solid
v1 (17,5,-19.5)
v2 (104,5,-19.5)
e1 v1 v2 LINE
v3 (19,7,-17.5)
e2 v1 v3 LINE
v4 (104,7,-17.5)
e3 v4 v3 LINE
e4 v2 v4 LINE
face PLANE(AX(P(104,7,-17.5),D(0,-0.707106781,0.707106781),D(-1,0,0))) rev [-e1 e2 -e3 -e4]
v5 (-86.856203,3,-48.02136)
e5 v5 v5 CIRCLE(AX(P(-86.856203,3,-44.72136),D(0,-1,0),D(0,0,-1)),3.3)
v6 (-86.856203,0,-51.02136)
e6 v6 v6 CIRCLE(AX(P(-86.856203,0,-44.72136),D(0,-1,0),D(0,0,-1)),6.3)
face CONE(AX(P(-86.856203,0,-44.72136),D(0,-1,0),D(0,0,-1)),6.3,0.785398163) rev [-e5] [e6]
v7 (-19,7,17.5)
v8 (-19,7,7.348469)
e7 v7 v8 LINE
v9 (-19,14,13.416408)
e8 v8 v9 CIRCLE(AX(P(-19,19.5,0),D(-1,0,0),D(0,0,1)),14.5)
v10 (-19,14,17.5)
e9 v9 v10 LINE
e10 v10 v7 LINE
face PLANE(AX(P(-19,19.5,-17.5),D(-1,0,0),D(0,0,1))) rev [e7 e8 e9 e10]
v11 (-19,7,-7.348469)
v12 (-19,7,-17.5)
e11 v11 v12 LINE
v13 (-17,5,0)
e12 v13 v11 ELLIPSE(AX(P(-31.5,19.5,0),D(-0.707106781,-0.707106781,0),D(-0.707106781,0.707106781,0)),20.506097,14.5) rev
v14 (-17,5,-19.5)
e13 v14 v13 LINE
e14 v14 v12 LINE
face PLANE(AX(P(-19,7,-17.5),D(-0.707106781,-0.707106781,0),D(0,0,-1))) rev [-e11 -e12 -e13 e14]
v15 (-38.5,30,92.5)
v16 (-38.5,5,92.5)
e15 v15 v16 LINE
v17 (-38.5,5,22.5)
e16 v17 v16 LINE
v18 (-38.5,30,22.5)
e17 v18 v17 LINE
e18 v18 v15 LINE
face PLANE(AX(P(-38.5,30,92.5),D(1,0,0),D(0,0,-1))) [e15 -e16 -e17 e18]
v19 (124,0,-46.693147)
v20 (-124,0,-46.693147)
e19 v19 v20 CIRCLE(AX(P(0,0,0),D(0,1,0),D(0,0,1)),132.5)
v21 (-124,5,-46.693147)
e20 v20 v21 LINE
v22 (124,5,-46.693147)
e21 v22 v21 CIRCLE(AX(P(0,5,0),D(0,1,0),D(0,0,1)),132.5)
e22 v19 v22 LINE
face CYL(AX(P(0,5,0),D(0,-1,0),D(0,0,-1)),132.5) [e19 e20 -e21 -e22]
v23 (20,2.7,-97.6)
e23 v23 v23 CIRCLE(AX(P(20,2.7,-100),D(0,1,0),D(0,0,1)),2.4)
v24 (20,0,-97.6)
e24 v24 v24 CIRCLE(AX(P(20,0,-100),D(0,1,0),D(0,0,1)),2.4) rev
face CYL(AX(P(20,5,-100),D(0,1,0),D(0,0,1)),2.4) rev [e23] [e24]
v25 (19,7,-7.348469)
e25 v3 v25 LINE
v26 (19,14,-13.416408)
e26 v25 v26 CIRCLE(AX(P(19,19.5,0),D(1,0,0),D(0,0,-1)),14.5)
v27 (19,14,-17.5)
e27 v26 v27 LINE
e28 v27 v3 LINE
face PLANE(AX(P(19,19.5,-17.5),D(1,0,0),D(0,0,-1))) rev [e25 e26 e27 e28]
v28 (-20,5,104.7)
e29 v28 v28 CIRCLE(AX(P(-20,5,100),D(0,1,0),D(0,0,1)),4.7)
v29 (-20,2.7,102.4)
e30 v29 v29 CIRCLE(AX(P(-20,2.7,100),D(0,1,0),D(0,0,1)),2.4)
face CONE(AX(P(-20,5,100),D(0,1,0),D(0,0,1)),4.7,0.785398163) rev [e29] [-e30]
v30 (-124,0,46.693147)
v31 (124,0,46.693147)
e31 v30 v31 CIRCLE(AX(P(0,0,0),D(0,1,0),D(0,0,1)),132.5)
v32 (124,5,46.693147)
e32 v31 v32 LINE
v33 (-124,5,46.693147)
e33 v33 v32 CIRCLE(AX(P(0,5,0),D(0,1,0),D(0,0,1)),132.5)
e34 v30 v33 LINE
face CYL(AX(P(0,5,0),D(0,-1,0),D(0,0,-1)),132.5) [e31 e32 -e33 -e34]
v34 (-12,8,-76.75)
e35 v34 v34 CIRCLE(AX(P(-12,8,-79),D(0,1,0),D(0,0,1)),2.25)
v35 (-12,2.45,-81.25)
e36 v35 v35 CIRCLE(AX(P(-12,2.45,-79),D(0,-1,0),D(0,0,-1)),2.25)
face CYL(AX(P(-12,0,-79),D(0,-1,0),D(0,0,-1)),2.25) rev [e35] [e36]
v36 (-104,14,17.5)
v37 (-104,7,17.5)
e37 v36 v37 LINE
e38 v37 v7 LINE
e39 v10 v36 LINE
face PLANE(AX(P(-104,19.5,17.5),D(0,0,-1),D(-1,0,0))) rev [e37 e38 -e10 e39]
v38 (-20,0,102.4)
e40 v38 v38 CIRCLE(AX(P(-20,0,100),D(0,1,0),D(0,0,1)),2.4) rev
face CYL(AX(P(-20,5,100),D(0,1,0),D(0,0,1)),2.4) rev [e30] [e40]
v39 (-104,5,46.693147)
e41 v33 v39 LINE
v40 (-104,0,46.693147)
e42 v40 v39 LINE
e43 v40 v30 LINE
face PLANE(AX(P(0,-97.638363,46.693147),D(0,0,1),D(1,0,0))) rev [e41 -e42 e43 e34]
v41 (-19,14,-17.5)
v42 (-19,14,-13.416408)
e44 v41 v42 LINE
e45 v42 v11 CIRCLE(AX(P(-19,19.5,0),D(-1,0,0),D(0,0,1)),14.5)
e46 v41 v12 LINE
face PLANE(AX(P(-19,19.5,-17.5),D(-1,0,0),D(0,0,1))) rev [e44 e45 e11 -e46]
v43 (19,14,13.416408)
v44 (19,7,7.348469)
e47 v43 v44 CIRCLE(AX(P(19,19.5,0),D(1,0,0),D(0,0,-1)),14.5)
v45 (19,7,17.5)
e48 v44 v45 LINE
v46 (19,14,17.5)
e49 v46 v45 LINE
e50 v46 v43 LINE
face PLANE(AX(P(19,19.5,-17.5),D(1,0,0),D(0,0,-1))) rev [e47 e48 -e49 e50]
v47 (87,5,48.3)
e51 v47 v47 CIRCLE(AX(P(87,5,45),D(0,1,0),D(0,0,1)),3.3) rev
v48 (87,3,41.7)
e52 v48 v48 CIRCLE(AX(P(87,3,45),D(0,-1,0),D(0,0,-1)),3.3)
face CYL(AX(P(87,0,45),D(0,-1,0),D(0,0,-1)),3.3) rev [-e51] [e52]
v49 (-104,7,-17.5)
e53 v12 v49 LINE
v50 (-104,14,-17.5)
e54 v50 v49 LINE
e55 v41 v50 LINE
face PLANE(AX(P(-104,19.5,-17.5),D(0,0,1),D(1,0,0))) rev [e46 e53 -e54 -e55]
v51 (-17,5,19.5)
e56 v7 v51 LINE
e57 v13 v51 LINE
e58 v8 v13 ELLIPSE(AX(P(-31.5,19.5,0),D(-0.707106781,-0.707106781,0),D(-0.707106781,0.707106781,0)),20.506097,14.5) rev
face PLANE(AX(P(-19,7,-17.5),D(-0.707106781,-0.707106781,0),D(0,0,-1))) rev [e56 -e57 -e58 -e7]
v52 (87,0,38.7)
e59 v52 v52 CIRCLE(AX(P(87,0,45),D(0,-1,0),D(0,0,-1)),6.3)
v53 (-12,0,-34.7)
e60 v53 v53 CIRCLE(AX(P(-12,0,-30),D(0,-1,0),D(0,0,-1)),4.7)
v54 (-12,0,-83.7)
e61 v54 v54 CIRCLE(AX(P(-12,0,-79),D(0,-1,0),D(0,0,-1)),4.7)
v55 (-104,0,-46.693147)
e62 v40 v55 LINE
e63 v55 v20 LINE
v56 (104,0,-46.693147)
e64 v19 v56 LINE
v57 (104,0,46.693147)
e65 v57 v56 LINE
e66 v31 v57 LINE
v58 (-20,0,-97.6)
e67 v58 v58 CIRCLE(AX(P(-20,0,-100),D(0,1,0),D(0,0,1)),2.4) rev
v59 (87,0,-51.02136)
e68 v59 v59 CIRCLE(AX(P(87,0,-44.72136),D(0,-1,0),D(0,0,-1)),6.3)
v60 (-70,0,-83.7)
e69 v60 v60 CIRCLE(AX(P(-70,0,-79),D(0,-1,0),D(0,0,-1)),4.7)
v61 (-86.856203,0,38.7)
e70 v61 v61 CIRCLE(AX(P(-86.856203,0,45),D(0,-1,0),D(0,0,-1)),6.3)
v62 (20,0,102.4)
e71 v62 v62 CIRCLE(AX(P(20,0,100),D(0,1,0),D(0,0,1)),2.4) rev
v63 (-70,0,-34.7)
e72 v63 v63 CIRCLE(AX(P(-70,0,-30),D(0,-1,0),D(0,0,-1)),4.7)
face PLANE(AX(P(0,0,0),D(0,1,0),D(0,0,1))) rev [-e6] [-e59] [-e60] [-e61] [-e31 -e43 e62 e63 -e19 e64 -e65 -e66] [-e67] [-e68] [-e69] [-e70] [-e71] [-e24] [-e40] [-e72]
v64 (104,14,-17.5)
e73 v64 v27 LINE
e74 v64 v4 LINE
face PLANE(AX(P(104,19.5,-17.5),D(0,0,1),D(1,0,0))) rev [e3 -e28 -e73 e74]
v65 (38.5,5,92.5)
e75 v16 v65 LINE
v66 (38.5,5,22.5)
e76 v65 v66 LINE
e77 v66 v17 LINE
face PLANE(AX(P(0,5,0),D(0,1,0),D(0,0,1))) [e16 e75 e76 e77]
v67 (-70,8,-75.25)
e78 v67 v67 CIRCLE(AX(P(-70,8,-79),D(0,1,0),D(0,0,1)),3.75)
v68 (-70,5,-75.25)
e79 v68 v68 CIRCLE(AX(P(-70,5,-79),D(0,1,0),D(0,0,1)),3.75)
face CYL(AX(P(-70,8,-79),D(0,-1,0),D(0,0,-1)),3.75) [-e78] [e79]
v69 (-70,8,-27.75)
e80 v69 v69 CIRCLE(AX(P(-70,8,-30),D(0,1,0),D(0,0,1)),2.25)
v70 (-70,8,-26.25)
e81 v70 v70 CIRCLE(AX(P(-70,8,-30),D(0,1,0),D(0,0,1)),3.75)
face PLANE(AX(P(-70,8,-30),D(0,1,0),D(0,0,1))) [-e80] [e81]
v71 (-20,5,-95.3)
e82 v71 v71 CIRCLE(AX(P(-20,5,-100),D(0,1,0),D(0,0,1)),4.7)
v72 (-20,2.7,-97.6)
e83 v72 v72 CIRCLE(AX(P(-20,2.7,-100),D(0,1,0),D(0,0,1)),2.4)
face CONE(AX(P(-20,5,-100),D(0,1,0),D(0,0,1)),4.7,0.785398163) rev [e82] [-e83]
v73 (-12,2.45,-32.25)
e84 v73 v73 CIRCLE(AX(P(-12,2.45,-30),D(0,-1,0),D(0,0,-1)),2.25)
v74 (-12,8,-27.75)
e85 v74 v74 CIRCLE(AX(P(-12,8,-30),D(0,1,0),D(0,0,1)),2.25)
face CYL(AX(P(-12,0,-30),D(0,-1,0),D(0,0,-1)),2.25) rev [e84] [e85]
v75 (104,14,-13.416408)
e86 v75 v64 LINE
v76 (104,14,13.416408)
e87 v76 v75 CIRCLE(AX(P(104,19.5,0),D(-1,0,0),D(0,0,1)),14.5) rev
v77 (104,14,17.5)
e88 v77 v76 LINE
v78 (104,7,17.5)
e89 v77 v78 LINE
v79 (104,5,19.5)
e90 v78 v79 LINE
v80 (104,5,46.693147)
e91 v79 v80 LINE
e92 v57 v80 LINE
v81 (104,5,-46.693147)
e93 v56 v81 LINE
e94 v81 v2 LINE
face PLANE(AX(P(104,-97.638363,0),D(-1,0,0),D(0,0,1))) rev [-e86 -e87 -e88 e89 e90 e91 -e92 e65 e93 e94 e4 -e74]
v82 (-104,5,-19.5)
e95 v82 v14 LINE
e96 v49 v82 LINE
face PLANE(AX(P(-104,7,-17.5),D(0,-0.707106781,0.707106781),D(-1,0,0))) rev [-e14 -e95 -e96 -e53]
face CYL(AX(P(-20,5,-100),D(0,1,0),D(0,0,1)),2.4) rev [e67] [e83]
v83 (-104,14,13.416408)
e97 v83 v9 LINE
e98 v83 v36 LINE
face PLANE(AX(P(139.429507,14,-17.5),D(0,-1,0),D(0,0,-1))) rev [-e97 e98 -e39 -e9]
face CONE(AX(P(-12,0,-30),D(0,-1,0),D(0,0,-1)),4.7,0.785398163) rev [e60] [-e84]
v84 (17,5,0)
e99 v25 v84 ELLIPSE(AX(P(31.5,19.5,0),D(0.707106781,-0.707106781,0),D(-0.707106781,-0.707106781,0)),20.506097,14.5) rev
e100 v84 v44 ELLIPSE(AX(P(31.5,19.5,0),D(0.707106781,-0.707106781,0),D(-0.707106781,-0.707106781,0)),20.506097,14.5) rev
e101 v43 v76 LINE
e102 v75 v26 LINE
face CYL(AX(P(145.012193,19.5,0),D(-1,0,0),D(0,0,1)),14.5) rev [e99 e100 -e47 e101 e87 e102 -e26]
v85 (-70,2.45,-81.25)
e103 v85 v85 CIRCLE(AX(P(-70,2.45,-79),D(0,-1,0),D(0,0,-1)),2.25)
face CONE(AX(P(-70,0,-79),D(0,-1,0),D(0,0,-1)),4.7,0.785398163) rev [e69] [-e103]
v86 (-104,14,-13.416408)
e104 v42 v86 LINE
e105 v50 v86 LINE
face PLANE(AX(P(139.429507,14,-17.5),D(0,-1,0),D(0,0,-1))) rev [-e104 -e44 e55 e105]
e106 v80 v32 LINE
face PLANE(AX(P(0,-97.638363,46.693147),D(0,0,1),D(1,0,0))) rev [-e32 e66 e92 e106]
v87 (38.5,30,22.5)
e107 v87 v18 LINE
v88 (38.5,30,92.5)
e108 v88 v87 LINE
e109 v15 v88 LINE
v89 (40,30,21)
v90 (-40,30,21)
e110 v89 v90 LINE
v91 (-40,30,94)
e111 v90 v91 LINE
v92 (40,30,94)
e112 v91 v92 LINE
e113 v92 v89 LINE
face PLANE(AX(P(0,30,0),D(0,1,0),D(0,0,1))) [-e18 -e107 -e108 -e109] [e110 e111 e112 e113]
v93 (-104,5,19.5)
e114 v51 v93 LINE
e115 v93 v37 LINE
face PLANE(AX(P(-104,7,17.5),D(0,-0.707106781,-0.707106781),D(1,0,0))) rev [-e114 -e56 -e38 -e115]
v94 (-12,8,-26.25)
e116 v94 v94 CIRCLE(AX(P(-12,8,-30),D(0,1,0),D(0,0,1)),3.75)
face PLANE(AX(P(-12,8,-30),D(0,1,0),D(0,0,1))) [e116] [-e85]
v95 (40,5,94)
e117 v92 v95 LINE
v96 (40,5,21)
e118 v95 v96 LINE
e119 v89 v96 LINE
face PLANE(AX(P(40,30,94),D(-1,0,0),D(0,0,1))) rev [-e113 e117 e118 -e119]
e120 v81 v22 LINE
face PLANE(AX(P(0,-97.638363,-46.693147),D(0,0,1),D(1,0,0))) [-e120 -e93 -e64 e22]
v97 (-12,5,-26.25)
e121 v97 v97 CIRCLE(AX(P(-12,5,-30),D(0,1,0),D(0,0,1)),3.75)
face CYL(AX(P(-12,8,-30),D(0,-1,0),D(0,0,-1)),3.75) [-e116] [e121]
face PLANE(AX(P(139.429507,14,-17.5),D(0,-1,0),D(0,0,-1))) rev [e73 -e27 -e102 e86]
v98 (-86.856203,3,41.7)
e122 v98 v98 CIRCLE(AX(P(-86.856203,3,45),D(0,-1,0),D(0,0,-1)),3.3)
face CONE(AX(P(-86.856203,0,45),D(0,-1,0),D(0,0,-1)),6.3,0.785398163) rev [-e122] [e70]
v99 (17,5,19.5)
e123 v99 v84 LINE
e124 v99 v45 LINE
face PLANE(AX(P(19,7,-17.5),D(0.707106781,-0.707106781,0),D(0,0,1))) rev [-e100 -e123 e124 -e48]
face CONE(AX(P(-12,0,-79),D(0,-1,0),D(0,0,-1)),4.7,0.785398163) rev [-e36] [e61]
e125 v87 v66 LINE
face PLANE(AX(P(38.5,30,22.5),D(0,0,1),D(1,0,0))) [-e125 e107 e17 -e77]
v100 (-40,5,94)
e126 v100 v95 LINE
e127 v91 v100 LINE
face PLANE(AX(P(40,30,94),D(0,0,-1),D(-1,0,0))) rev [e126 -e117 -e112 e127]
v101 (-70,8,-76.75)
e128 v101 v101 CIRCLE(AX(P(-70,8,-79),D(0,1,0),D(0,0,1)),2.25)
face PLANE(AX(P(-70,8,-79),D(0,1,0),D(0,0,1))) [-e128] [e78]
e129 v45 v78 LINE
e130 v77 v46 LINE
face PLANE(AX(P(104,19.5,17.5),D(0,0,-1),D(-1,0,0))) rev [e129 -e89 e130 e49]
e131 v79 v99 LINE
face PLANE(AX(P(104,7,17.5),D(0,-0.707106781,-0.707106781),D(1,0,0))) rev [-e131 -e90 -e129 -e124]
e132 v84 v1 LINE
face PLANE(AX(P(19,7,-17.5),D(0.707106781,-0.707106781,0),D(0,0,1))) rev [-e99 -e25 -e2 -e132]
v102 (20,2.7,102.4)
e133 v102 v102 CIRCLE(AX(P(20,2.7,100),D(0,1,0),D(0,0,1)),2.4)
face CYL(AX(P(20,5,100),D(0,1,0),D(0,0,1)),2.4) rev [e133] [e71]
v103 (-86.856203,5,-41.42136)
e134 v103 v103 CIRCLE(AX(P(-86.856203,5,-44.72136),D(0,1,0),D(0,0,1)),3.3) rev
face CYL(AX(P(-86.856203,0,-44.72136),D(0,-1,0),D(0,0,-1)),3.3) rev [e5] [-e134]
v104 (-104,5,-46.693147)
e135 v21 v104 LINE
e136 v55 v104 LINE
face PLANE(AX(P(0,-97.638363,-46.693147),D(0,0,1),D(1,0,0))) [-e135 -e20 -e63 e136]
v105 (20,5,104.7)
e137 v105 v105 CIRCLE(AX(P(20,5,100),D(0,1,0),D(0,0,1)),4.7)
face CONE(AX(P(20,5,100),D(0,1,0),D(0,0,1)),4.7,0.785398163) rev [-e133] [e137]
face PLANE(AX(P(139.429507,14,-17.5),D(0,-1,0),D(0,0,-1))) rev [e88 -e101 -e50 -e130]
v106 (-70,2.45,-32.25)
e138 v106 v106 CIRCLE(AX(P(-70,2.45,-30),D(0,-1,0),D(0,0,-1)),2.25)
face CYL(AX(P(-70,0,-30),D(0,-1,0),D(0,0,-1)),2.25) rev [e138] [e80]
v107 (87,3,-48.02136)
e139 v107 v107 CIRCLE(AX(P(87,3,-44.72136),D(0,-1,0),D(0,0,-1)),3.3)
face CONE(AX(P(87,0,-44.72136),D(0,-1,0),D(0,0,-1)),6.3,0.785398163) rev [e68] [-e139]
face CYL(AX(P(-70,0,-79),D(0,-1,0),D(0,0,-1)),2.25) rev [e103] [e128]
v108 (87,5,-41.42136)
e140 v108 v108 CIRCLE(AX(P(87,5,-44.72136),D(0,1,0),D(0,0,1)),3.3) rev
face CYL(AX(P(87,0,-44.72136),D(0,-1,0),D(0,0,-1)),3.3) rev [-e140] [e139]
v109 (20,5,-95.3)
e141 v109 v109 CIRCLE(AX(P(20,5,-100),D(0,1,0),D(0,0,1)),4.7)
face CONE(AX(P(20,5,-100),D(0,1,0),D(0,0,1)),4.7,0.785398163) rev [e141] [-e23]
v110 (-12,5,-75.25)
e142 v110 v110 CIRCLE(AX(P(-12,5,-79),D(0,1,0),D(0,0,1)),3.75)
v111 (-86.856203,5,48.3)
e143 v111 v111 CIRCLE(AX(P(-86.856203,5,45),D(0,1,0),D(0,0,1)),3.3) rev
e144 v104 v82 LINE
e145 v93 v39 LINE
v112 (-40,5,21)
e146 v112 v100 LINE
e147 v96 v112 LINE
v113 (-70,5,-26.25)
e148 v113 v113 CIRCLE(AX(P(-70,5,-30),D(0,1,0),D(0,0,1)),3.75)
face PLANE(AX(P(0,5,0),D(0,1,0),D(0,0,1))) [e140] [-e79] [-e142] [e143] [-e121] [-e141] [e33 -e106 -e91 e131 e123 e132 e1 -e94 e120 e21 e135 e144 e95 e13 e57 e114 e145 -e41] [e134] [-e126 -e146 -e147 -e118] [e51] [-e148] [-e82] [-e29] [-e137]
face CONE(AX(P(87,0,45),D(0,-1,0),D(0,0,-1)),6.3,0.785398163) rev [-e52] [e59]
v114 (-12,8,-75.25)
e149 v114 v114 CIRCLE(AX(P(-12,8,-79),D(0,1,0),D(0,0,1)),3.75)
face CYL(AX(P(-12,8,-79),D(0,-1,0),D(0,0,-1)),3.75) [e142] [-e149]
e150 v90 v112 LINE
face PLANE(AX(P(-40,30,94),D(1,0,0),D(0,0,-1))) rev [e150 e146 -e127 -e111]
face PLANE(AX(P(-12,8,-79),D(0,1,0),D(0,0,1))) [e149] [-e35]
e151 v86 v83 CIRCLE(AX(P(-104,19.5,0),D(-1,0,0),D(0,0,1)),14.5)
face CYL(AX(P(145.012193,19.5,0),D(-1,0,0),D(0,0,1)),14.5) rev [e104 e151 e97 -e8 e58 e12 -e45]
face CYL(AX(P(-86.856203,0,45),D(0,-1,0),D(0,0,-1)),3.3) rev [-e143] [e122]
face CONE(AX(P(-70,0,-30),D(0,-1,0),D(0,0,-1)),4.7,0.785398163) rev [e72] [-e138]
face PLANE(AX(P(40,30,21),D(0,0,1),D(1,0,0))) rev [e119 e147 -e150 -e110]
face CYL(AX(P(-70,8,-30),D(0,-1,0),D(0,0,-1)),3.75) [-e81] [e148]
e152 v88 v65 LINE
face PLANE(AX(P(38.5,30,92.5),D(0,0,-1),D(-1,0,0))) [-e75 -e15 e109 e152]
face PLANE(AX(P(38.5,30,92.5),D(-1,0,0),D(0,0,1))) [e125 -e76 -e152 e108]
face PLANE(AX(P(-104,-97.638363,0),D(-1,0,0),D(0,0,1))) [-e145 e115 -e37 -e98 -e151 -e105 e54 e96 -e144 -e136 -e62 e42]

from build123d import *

# Parameters (mm, degrees)
CROQUIS1_R                                           = 132.5
SALIENTE_EXTRUIR1_DEPTH                              = 5
CORTAR_EXTRUIR4_START                                = -5
CORTAR_EXTRUIR4_DEPTH                                = 5
AVELLANADO_PARA_TORNILLO_CON_CABEZA_PLAN_D           = 4.5
AVELLANADO_PARA_TORNILLO_CON_CABEZA_PLAN_CSINK_D     = 9.4
AVELLANADO_PARA_TORNILLO_CON_CABEZA_PLAN_CSINK_ANGLE = 90
AVELLANADO_PARA_TORNILLO_CON_CABEZA_2_D              = 6.6
AVELLANADO_PARA_TORNILLO_CON_CABEZA_2_CSINK_D        = 12.6
AVELLANADO_PARA_TORNILLO_CON_CABEZA_2_CSINK_ANGLE    = 90
AVELLANADO_PARA_TORNILLO_CON_CABEZA_3_D              = 4.8
AVELLANADO_PARA_TORNILLO_CON_CABEZA_3_CSINK_D        = 9.4
AVELLANADO_PARA_TORNILLO_CON_CABEZA_3_CSINK_ANGLE    = 90
CROQUIS32_W                                          = 85
CROQUIS32_H                                          = 35
SALIENTE_EXTRUIR6_DEPTH                              = 14.5
CORTAR_EXTRUIR8_REACH                                = 266.425
CROQUIS33_R                                          = 14.5
CORTAR_EXTRUIR9_START                                = -208
CROQUIS34_W                                          = 35
CROQUIS34_H                                          = 5.5
CORTAR_EXTRUIR9_DEPTH                                = 208
CHAFL_N2_SIZE                                        = 2
CROQUIS35_W                                          = 80
CROQUIS35_H                                          = 73
CROQUIS35_W_2                                        = 77
CROQUIS35_H_2                                        = 70
SALIENTE_EXTRUIR7_DEPTH                              = 25
SALIENTE_EXTRUIR8_START                              = 3
CROQUIS36_R                                          = 3.75
CROQUIS36_R_2                                        = 2.25
SALIENTE_EXTRUIR8_DEPTH                              = 3


with BuildPart() as part:
    # Croquis1 → Saliente-Extruir1 (new body)
    with BuildSketch(Plane(origin=(0, 0, 0), x_dir=(1, 0, 0), z_dir=(0, 1, 0))):
        with Locations(Location((0, 0, 0), (0, 0, 270))):
            Circle(CROQUIS1_R)
    extrude(amount=SALIENTE_EXTRUIR1_DEPTH)

    # Croquis6 → Cortar-Extruir4 (cut)
    with BuildSketch(Plane(origin=(0, 5, 0), x_dir=(1, 0, 0), z_dir=(0, 1, 0)).offset(CORTAR_EXTRUIR4_START)):
        with BuildLine():
            Line((-104, 46.693147249), (-104, -46.693147249))
            Line((-104, -46.693147249), (-124, -46.693147249))
            ThreePointArc((-124, -46.693147249), (-132.5, 0), (-124, 46.693147249))
            Line((-124, 46.693147249), (-104, 46.693147249))
        make_face()
        with BuildLine():
            Line((104, 46.693147249), (104, -46.693147249))
            Line((104, -46.693147249), (124, -46.693147249))
            ThreePointArc((124, -46.693147249), (132.5, 0), (124, 46.693147249))
            Line((124, 46.693147249), (104, 46.693147249))
        make_face()
    extrude(amount=CORTAR_EXTRUIR4_DEPTH, mode=Mode.SUBTRACT)

    # Avellanado para tornillo con cabeza plan (through all)
    with Locations(Plane(origin=(0, 0, 0), x_dir=(-1, 0, 0), z_dir=(0, -1, 0))):
        with Locations((70, 30), (12, 30), (70, 79), (12, 79)):
            CounterSinkHole(AVELLANADO_PARA_TORNILLO_CON_CABEZA_PLAN_D / 2, AVELLANADO_PARA_TORNILLO_CON_CABEZA_PLAN_CSINK_D / 2, counter_sink_angle=AVELLANADO_PARA_TORNILLO_CON_CABEZA_PLAN_CSINK_ANGLE)

    # Avellanado para tornillo con cabeza  2 (through all)
    with Locations(Plane(origin=(87, 0, 45), x_dir=(0, 0, -1), z_dir=(0, -1, 0))):
        with Locations((0, 0), (0, -173.856203002), (89.72135955, -173.856203002), (89.72135955, 0)):
            CounterSinkHole(AVELLANADO_PARA_TORNILLO_CON_CABEZA_2_D / 2, AVELLANADO_PARA_TORNILLO_CON_CABEZA_2_CSINK_D / 2, counter_sink_angle=AVELLANADO_PARA_TORNILLO_CON_CABEZA_2_CSINK_ANGLE)

    # Avellanado para tornillo con cabeza  3 (through all)
    with Locations(Plane(origin=(0, 5, 0), x_dir=(1, 0, 0), z_dir=(0, 1, 0))):
        with Locations((-20, -100), (20, -100), (-20, 100), (20, 100)):
            CounterSinkHole(AVELLANADO_PARA_TORNILLO_CON_CABEZA_3_D / 2, AVELLANADO_PARA_TORNILLO_CON_CABEZA_3_CSINK_D / 2, counter_sink_angle=AVELLANADO_PARA_TORNILLO_CON_CABEZA_3_CSINK_ANGLE)

    # Croquis32 → Saliente-Extruir6 (add)
    with BuildSketch(Plane(origin=(0, 5, 0), x_dir=(1, 0, 0), z_dir=(0, 1, 0))):
        with Locations((61.5, 0)):
            Rectangle(CROQUIS32_W, CROQUIS32_H)
        with Locations((-61.5, 0)):
            Rectangle(CROQUIS32_W, CROQUIS32_H)
    extrude(amount=SALIENTE_EXTRUIR6_DEPTH)

    # Cortar-Extruir8: up to this face of the body (flat: up to its plane)
    cortar_extruir8_end = Plane(part.part.faces().sort_by_distance((104, 7.577960985, 0))[0])
    # Croquis33 → Cortar-Extruir8 (cut, up to the picked face)
    with BuildSketch(Plane.ZY.offset(104), mode=Mode.PRIVATE) as cortar_extruir8_sk1:
        with Locations((0, 19.5)):
            Circle(CROQUIS33_R)
    cortar_extruir8_tool1 = split(extrude(cortar_extruir8_sk1.sketch, amount=-CORTAR_EXTRUIR8_REACH, mode=Mode.PRIVATE), bisect_by=cortar_extruir8_end, keep=Keep.BOTH, mode=Mode.PRIVATE)
    add(cortar_extruir8_tool1.solids().sort_by(Axis((-104, 19.5, 0), (1, 0, 0)))[0], mode=Mode.SUBTRACT)

    # Croquis34 → Cortar-Extruir9 (cut)
    with BuildSketch(Plane.ZY.offset(104).offset(CORTAR_EXTRUIR9_START)):
        with Locations((0, 16.75)):
            Rectangle(CROQUIS34_W, CROQUIS34_H)
    extrude(amount=CORTAR_EXTRUIR9_DEPTH, mode=Mode.SUBTRACT)

    # Chaflán2
    # the kernel refuses this chamfer: 2 mm, written as the material it adds along each edge
    with BuildSketch(Plane(origin=(104, 5, -17.5), x_dir=(0, 0, -1), z_dir=(-1, 0, 0)), Plane(origin=(19, 5, 17.5), x_dir=(0, 0, 1), z_dir=(1, 0, 0))) as chafl_n2_piece_1:
        Polygon((CHAFL_N2_SIZE, 0), (0, -CHAFL_N2_SIZE), (0, 0), align=None)
    extrude(amount=85)
    with BuildSketch(Plane(origin=(19, 5, -17.5), x_dir=(-1, 0, 0), z_dir=(0, 0, 1))) as chafl_n2_piece_2_section:
        Polygon((CHAFL_N2_SIZE, 0), (0, -CHAFL_N2_SIZE), (0, 0), align=None)
    chafl_n2_piece_2 = extrude(amount=17.5, mode=Mode.PRIVATE)
    chafl_n2_piece_2 = chafl_n2_piece_2 - Plane(origin=(19, 19.5, 0), x_dir=(0, 0, 1), z_dir=(-1, 0, 0)) * Cylinder(14.5, 43, mode=Mode.PRIVATE)
    add(chafl_n2_piece_2)
    with BuildSketch(Plane(origin=(-19, 5, 17.5), x_dir=(0, 0, 1), z_dir=(-1, 0, 0)), Plane(origin=(-104, 5, -17.5), x_dir=(0, 0, -1), z_dir=(1, 0, 0))) as chafl_n2_piece_3:
        Polygon((CHAFL_N2_SIZE, 0), (0, CHAFL_N2_SIZE), (0, 0), align=None)
    extrude(amount=85)
    with BuildSketch(Plane(origin=(-19, 5, 0), x_dir=(1, 0, 0), z_dir=(0, 0, 1))) as chafl_n2_piece_4_section:
        Polygon((CHAFL_N2_SIZE, 0), (0, CHAFL_N2_SIZE), (0, 0), align=None)
    chafl_n2_piece_4 = extrude(amount=17.5, mode=Mode.PRIVATE)
    chafl_n2_piece_4 = chafl_n2_piece_4 - Plane(origin=(-19, 19.5, 0), x_dir=(0, 0, 1), z_dir=(-1, 0, 0)) * Cylinder(14.5, 44, mode=Mode.PRIVATE)
    add(chafl_n2_piece_4)
    with BuildSketch(Plane(origin=(-19, 5, -17.5), x_dir=(1, 0, 0), z_dir=(0, 0, 1))) as chafl_n2_piece_5_section:
        Polygon((CHAFL_N2_SIZE, 0), (0, CHAFL_N2_SIZE), (0, 0), align=None)
    chafl_n2_piece_5 = extrude(amount=17.5, mode=Mode.PRIVATE)
    chafl_n2_piece_5 = chafl_n2_piece_5 - Plane(origin=(-19, 19.5, 0), x_dir=(0, 0, 1), z_dir=(-1, 0, 0)) * Cylinder(14.5, 43, mode=Mode.PRIVATE)
    add(chafl_n2_piece_5)
    with BuildSketch(Plane(origin=(19, 5, 0), x_dir=(-1, 0, 0), z_dir=(0, 0, 1))) as chafl_n2_piece_6_section:
        Polygon((CHAFL_N2_SIZE, 0), (0, -CHAFL_N2_SIZE), (0, 0), align=None)
    chafl_n2_piece_6 = extrude(amount=17.5, mode=Mode.PRIVATE)
    chafl_n2_piece_6 = chafl_n2_piece_6 - Plane(origin=(19, 19.5, 0), x_dir=(0, 0, 1), z_dir=(-1, 0, 0)) * Cylinder(14.5, 44, mode=Mode.PRIVATE)
    add(chafl_n2_piece_6)
    with BuildSketch(Plane(origin=(19, 5, -22.643365976), x_dir=(-1, 0, 0), z_dir=(0, 0, 1))) as chafl_n2_piece_7a_section:
        Polygon((CHAFL_N2_SIZE, 0), (0, -CHAFL_N2_SIZE), (0, 0), align=None)
    chafl_n2_piece_7a = extrude(amount=22.643365976, mode=Mode.PRIVATE)
    chafl_n2_piece_7a = split(chafl_n2_piece_7a, bisect_by=Plane(origin=(19, 5, -17.5), z_dir=(0, 0, -1)), keep=Keep.TOP, mode=Mode.PRIVATE)
    with BuildSketch(Plane(origin=(104, 5, -17.5), x_dir=(0, 0, -1), z_dir=(-1, 0, 0))) as chafl_n2_piece_7b_section:
        Polygon((CHAFL_N2_SIZE, 0), (0, -CHAFL_N2_SIZE), (0, 0), align=None)
    chafl_n2_piece_7b = extrude(amount=90.143365976, mode=Mode.PRIVATE)
    chafl_n2_piece_7b = split(chafl_n2_piece_7b, bisect_by=Plane(origin=(19, 5, -17.5), z_dir=(-1, 0, 0)), keep=Keep.TOP, mode=Mode.PRIVATE)
    chafl_n2_piece_7 = chafl_n2_piece_7a & chafl_n2_piece_7b
    add(chafl_n2_piece_7)
    with BuildSketch(Plane(origin=(13.856634024, 5, 17.5), x_dir=(0, 0, 1), z_dir=(1, 0, 0))) as chafl_n2_piece_8a_section:
        Polygon((CHAFL_N2_SIZE, 0), (0, -CHAFL_N2_SIZE), (0, 0), align=None)
    chafl_n2_piece_8a = extrude(amount=90.143365976, mode=Mode.PRIVATE)
    chafl_n2_piece_8a = split(chafl_n2_piece_8a, bisect_by=Plane(origin=(19, 5, 17.5), z_dir=(-1, 0, 0)), keep=Keep.TOP, mode=Mode.PRIVATE)
    with BuildSketch(Plane(origin=(19, 5, 0), x_dir=(-1, 0, 0), z_dir=(0, 0, 1))) as chafl_n2_piece_8b_section:
        Polygon((CHAFL_N2_SIZE, 0), (0, -CHAFL_N2_SIZE), (0, 0), align=None)
    chafl_n2_piece_8b = extrude(amount=22.643365976, mode=Mode.PRIVATE)
    chafl_n2_piece_8b = split(chafl_n2_piece_8b, bisect_by=Plane(origin=(19, 5, 17.5), z_dir=(0, 0, 1)), keep=Keep.TOP, mode=Mode.PRIVATE)
    chafl_n2_piece_8 = chafl_n2_piece_8a & chafl_n2_piece_8b
    add(chafl_n2_piece_8)
    with BuildSketch(Plane(origin=(-13.856634024, 5, 17.5), x_dir=(0, 0, 1), z_dir=(-1, 0, 0))) as chafl_n2_piece_9a_section:
        Polygon((CHAFL_N2_SIZE, 0), (0, CHAFL_N2_SIZE), (0, 0), align=None)
    chafl_n2_piece_9a = extrude(amount=90.143365976, mode=Mode.PRIVATE)
    chafl_n2_piece_9a = split(chafl_n2_piece_9a, bisect_by=Plane(origin=(-19, 5, 17.5), z_dir=(1, 0, 0)), keep=Keep.TOP, mode=Mode.PRIVATE)
    with BuildSketch(Plane(origin=(-19, 5, 0), x_dir=(1, 0, 0), z_dir=(0, 0, 1))) as chafl_n2_piece_9b_section:
        Polygon((CHAFL_N2_SIZE, 0), (0, CHAFL_N2_SIZE), (0, 0), align=None)
    chafl_n2_piece_9b = extrude(amount=22.643365976, mode=Mode.PRIVATE)
    chafl_n2_piece_9b = split(chafl_n2_piece_9b, bisect_by=Plane(origin=(-19, 5, 17.5), z_dir=(0, 0, 1)), keep=Keep.TOP, mode=Mode.PRIVATE)
    chafl_n2_piece_9 = chafl_n2_piece_9a & chafl_n2_piece_9b
    add(chafl_n2_piece_9)
    with BuildSketch(Plane(origin=(-104, 5, -17.5), x_dir=(0, 0, -1), z_dir=(1, 0, 0))) as chafl_n2_piece_10a_section:
        Polygon((CHAFL_N2_SIZE, 0), (0, CHAFL_N2_SIZE), (0, 0), align=None)
    chafl_n2_piece_10a = extrude(amount=90.143365976, mode=Mode.PRIVATE)
    chafl_n2_piece_10a = split(chafl_n2_piece_10a, bisect_by=Plane(origin=(-19, 5, -17.5), z_dir=(1, 0, 0)), keep=Keep.TOP, mode=Mode.PRIVATE)
    with BuildSketch(Plane(origin=(-19, 5, -22.643365976), x_dir=(1, 0, 0), z_dir=(0, 0, 1))) as chafl_n2_piece_10b_section:
        Polygon((CHAFL_N2_SIZE, 0), (0, CHAFL_N2_SIZE), (0, 0), align=None)
    chafl_n2_piece_10b = extrude(amount=22.643365976, mode=Mode.PRIVATE)
    chafl_n2_piece_10b = split(chafl_n2_piece_10b, bisect_by=Plane(origin=(-19, 5, -17.5), z_dir=(0, 0, -1)), keep=Keep.TOP, mode=Mode.PRIVATE)
    chafl_n2_piece_10 = chafl_n2_piece_10a & chafl_n2_piece_10b
    add(chafl_n2_piece_10)

    # Croquis35 → Saliente-Extruir7 (add)
    with BuildSketch(Plane(origin=(0, 5, 0), x_dir=(1, 0, 0), z_dir=(0, 1, 0))):
        with Locations((0, -57.5)):
            Rectangle(CROQUIS35_W, CROQUIS35_H)
        with Locations((0, -57.5)):
            Rectangle(CROQUIS35_W_2, CROQUIS35_H_2, mode=Mode.SUBTRACT)
    extrude(amount=SALIENTE_EXTRUIR7_DEPTH)

    # Croquis36 → Saliente-Extruir8 (add)
    # profile 1 of 4: a face of its own
    with BuildSketch(Plane(origin=(0, 5, 0), x_dir=(1, 0, 0), z_dir=(0, 1, 0)).offset(SALIENTE_EXTRUIR8_START)):
        with Locations(Location((-70, 79, 0), (0, 0, 270))):
            Circle(CROQUIS36_R)
        with Locations(Location((-70, 79, 0), (0, 0, 90))):
            Circle(CROQUIS36_R_2, mode=Mode.SUBTRACT)
    # profile 2 of 4: a face of its own
    with BuildSketch(Plane(origin=(0, 5, 0), x_dir=(1, 0, 0), z_dir=(0, 1, 0)).offset(SALIENTE_EXTRUIR8_START)):
        with Locations(Location((-12, 79, 0), (0, 0, 270))):
            Circle(CROQUIS36_R)
        with Locations(Location((-12, 79, 0), (0, 0, 90))):
            Circle(CROQUIS36_R_2, mode=Mode.SUBTRACT)
    # profile 3 of 4: a face of its own
    with BuildSketch(Plane(origin=(0, 5, 0), x_dir=(1, 0, 0), z_dir=(0, 1, 0)).offset(SALIENTE_EXTRUIR8_START)):
        with Locations(Location((-12, 30, 0), (0, 0, 270))):
            Circle(CROQUIS36_R)
        with Locations(Location((-12, 30, 0), (0, 0, 90))):
            Circle(CROQUIS36_R_2, mode=Mode.SUBTRACT)
    # profile 4 of 4: a face of its own
    with BuildSketch(Plane(origin=(0, 5, 0), x_dir=(1, 0, 0), z_dir=(0, 1, 0)).offset(SALIENTE_EXTRUIR8_START)):
        with Locations(Location((-70, 30, 0), (0, 0, 270))):
            Circle(CROQUIS36_R)
        with Locations(Location((-70, 30, 0), (0, 0, 90))):
            Circle(CROQUIS36_R_2, mode=Mode.SUBTRACT)
    extrude(amount=-SALIENTE_EXTRUIR8_DEPTH)


solid = part.part
